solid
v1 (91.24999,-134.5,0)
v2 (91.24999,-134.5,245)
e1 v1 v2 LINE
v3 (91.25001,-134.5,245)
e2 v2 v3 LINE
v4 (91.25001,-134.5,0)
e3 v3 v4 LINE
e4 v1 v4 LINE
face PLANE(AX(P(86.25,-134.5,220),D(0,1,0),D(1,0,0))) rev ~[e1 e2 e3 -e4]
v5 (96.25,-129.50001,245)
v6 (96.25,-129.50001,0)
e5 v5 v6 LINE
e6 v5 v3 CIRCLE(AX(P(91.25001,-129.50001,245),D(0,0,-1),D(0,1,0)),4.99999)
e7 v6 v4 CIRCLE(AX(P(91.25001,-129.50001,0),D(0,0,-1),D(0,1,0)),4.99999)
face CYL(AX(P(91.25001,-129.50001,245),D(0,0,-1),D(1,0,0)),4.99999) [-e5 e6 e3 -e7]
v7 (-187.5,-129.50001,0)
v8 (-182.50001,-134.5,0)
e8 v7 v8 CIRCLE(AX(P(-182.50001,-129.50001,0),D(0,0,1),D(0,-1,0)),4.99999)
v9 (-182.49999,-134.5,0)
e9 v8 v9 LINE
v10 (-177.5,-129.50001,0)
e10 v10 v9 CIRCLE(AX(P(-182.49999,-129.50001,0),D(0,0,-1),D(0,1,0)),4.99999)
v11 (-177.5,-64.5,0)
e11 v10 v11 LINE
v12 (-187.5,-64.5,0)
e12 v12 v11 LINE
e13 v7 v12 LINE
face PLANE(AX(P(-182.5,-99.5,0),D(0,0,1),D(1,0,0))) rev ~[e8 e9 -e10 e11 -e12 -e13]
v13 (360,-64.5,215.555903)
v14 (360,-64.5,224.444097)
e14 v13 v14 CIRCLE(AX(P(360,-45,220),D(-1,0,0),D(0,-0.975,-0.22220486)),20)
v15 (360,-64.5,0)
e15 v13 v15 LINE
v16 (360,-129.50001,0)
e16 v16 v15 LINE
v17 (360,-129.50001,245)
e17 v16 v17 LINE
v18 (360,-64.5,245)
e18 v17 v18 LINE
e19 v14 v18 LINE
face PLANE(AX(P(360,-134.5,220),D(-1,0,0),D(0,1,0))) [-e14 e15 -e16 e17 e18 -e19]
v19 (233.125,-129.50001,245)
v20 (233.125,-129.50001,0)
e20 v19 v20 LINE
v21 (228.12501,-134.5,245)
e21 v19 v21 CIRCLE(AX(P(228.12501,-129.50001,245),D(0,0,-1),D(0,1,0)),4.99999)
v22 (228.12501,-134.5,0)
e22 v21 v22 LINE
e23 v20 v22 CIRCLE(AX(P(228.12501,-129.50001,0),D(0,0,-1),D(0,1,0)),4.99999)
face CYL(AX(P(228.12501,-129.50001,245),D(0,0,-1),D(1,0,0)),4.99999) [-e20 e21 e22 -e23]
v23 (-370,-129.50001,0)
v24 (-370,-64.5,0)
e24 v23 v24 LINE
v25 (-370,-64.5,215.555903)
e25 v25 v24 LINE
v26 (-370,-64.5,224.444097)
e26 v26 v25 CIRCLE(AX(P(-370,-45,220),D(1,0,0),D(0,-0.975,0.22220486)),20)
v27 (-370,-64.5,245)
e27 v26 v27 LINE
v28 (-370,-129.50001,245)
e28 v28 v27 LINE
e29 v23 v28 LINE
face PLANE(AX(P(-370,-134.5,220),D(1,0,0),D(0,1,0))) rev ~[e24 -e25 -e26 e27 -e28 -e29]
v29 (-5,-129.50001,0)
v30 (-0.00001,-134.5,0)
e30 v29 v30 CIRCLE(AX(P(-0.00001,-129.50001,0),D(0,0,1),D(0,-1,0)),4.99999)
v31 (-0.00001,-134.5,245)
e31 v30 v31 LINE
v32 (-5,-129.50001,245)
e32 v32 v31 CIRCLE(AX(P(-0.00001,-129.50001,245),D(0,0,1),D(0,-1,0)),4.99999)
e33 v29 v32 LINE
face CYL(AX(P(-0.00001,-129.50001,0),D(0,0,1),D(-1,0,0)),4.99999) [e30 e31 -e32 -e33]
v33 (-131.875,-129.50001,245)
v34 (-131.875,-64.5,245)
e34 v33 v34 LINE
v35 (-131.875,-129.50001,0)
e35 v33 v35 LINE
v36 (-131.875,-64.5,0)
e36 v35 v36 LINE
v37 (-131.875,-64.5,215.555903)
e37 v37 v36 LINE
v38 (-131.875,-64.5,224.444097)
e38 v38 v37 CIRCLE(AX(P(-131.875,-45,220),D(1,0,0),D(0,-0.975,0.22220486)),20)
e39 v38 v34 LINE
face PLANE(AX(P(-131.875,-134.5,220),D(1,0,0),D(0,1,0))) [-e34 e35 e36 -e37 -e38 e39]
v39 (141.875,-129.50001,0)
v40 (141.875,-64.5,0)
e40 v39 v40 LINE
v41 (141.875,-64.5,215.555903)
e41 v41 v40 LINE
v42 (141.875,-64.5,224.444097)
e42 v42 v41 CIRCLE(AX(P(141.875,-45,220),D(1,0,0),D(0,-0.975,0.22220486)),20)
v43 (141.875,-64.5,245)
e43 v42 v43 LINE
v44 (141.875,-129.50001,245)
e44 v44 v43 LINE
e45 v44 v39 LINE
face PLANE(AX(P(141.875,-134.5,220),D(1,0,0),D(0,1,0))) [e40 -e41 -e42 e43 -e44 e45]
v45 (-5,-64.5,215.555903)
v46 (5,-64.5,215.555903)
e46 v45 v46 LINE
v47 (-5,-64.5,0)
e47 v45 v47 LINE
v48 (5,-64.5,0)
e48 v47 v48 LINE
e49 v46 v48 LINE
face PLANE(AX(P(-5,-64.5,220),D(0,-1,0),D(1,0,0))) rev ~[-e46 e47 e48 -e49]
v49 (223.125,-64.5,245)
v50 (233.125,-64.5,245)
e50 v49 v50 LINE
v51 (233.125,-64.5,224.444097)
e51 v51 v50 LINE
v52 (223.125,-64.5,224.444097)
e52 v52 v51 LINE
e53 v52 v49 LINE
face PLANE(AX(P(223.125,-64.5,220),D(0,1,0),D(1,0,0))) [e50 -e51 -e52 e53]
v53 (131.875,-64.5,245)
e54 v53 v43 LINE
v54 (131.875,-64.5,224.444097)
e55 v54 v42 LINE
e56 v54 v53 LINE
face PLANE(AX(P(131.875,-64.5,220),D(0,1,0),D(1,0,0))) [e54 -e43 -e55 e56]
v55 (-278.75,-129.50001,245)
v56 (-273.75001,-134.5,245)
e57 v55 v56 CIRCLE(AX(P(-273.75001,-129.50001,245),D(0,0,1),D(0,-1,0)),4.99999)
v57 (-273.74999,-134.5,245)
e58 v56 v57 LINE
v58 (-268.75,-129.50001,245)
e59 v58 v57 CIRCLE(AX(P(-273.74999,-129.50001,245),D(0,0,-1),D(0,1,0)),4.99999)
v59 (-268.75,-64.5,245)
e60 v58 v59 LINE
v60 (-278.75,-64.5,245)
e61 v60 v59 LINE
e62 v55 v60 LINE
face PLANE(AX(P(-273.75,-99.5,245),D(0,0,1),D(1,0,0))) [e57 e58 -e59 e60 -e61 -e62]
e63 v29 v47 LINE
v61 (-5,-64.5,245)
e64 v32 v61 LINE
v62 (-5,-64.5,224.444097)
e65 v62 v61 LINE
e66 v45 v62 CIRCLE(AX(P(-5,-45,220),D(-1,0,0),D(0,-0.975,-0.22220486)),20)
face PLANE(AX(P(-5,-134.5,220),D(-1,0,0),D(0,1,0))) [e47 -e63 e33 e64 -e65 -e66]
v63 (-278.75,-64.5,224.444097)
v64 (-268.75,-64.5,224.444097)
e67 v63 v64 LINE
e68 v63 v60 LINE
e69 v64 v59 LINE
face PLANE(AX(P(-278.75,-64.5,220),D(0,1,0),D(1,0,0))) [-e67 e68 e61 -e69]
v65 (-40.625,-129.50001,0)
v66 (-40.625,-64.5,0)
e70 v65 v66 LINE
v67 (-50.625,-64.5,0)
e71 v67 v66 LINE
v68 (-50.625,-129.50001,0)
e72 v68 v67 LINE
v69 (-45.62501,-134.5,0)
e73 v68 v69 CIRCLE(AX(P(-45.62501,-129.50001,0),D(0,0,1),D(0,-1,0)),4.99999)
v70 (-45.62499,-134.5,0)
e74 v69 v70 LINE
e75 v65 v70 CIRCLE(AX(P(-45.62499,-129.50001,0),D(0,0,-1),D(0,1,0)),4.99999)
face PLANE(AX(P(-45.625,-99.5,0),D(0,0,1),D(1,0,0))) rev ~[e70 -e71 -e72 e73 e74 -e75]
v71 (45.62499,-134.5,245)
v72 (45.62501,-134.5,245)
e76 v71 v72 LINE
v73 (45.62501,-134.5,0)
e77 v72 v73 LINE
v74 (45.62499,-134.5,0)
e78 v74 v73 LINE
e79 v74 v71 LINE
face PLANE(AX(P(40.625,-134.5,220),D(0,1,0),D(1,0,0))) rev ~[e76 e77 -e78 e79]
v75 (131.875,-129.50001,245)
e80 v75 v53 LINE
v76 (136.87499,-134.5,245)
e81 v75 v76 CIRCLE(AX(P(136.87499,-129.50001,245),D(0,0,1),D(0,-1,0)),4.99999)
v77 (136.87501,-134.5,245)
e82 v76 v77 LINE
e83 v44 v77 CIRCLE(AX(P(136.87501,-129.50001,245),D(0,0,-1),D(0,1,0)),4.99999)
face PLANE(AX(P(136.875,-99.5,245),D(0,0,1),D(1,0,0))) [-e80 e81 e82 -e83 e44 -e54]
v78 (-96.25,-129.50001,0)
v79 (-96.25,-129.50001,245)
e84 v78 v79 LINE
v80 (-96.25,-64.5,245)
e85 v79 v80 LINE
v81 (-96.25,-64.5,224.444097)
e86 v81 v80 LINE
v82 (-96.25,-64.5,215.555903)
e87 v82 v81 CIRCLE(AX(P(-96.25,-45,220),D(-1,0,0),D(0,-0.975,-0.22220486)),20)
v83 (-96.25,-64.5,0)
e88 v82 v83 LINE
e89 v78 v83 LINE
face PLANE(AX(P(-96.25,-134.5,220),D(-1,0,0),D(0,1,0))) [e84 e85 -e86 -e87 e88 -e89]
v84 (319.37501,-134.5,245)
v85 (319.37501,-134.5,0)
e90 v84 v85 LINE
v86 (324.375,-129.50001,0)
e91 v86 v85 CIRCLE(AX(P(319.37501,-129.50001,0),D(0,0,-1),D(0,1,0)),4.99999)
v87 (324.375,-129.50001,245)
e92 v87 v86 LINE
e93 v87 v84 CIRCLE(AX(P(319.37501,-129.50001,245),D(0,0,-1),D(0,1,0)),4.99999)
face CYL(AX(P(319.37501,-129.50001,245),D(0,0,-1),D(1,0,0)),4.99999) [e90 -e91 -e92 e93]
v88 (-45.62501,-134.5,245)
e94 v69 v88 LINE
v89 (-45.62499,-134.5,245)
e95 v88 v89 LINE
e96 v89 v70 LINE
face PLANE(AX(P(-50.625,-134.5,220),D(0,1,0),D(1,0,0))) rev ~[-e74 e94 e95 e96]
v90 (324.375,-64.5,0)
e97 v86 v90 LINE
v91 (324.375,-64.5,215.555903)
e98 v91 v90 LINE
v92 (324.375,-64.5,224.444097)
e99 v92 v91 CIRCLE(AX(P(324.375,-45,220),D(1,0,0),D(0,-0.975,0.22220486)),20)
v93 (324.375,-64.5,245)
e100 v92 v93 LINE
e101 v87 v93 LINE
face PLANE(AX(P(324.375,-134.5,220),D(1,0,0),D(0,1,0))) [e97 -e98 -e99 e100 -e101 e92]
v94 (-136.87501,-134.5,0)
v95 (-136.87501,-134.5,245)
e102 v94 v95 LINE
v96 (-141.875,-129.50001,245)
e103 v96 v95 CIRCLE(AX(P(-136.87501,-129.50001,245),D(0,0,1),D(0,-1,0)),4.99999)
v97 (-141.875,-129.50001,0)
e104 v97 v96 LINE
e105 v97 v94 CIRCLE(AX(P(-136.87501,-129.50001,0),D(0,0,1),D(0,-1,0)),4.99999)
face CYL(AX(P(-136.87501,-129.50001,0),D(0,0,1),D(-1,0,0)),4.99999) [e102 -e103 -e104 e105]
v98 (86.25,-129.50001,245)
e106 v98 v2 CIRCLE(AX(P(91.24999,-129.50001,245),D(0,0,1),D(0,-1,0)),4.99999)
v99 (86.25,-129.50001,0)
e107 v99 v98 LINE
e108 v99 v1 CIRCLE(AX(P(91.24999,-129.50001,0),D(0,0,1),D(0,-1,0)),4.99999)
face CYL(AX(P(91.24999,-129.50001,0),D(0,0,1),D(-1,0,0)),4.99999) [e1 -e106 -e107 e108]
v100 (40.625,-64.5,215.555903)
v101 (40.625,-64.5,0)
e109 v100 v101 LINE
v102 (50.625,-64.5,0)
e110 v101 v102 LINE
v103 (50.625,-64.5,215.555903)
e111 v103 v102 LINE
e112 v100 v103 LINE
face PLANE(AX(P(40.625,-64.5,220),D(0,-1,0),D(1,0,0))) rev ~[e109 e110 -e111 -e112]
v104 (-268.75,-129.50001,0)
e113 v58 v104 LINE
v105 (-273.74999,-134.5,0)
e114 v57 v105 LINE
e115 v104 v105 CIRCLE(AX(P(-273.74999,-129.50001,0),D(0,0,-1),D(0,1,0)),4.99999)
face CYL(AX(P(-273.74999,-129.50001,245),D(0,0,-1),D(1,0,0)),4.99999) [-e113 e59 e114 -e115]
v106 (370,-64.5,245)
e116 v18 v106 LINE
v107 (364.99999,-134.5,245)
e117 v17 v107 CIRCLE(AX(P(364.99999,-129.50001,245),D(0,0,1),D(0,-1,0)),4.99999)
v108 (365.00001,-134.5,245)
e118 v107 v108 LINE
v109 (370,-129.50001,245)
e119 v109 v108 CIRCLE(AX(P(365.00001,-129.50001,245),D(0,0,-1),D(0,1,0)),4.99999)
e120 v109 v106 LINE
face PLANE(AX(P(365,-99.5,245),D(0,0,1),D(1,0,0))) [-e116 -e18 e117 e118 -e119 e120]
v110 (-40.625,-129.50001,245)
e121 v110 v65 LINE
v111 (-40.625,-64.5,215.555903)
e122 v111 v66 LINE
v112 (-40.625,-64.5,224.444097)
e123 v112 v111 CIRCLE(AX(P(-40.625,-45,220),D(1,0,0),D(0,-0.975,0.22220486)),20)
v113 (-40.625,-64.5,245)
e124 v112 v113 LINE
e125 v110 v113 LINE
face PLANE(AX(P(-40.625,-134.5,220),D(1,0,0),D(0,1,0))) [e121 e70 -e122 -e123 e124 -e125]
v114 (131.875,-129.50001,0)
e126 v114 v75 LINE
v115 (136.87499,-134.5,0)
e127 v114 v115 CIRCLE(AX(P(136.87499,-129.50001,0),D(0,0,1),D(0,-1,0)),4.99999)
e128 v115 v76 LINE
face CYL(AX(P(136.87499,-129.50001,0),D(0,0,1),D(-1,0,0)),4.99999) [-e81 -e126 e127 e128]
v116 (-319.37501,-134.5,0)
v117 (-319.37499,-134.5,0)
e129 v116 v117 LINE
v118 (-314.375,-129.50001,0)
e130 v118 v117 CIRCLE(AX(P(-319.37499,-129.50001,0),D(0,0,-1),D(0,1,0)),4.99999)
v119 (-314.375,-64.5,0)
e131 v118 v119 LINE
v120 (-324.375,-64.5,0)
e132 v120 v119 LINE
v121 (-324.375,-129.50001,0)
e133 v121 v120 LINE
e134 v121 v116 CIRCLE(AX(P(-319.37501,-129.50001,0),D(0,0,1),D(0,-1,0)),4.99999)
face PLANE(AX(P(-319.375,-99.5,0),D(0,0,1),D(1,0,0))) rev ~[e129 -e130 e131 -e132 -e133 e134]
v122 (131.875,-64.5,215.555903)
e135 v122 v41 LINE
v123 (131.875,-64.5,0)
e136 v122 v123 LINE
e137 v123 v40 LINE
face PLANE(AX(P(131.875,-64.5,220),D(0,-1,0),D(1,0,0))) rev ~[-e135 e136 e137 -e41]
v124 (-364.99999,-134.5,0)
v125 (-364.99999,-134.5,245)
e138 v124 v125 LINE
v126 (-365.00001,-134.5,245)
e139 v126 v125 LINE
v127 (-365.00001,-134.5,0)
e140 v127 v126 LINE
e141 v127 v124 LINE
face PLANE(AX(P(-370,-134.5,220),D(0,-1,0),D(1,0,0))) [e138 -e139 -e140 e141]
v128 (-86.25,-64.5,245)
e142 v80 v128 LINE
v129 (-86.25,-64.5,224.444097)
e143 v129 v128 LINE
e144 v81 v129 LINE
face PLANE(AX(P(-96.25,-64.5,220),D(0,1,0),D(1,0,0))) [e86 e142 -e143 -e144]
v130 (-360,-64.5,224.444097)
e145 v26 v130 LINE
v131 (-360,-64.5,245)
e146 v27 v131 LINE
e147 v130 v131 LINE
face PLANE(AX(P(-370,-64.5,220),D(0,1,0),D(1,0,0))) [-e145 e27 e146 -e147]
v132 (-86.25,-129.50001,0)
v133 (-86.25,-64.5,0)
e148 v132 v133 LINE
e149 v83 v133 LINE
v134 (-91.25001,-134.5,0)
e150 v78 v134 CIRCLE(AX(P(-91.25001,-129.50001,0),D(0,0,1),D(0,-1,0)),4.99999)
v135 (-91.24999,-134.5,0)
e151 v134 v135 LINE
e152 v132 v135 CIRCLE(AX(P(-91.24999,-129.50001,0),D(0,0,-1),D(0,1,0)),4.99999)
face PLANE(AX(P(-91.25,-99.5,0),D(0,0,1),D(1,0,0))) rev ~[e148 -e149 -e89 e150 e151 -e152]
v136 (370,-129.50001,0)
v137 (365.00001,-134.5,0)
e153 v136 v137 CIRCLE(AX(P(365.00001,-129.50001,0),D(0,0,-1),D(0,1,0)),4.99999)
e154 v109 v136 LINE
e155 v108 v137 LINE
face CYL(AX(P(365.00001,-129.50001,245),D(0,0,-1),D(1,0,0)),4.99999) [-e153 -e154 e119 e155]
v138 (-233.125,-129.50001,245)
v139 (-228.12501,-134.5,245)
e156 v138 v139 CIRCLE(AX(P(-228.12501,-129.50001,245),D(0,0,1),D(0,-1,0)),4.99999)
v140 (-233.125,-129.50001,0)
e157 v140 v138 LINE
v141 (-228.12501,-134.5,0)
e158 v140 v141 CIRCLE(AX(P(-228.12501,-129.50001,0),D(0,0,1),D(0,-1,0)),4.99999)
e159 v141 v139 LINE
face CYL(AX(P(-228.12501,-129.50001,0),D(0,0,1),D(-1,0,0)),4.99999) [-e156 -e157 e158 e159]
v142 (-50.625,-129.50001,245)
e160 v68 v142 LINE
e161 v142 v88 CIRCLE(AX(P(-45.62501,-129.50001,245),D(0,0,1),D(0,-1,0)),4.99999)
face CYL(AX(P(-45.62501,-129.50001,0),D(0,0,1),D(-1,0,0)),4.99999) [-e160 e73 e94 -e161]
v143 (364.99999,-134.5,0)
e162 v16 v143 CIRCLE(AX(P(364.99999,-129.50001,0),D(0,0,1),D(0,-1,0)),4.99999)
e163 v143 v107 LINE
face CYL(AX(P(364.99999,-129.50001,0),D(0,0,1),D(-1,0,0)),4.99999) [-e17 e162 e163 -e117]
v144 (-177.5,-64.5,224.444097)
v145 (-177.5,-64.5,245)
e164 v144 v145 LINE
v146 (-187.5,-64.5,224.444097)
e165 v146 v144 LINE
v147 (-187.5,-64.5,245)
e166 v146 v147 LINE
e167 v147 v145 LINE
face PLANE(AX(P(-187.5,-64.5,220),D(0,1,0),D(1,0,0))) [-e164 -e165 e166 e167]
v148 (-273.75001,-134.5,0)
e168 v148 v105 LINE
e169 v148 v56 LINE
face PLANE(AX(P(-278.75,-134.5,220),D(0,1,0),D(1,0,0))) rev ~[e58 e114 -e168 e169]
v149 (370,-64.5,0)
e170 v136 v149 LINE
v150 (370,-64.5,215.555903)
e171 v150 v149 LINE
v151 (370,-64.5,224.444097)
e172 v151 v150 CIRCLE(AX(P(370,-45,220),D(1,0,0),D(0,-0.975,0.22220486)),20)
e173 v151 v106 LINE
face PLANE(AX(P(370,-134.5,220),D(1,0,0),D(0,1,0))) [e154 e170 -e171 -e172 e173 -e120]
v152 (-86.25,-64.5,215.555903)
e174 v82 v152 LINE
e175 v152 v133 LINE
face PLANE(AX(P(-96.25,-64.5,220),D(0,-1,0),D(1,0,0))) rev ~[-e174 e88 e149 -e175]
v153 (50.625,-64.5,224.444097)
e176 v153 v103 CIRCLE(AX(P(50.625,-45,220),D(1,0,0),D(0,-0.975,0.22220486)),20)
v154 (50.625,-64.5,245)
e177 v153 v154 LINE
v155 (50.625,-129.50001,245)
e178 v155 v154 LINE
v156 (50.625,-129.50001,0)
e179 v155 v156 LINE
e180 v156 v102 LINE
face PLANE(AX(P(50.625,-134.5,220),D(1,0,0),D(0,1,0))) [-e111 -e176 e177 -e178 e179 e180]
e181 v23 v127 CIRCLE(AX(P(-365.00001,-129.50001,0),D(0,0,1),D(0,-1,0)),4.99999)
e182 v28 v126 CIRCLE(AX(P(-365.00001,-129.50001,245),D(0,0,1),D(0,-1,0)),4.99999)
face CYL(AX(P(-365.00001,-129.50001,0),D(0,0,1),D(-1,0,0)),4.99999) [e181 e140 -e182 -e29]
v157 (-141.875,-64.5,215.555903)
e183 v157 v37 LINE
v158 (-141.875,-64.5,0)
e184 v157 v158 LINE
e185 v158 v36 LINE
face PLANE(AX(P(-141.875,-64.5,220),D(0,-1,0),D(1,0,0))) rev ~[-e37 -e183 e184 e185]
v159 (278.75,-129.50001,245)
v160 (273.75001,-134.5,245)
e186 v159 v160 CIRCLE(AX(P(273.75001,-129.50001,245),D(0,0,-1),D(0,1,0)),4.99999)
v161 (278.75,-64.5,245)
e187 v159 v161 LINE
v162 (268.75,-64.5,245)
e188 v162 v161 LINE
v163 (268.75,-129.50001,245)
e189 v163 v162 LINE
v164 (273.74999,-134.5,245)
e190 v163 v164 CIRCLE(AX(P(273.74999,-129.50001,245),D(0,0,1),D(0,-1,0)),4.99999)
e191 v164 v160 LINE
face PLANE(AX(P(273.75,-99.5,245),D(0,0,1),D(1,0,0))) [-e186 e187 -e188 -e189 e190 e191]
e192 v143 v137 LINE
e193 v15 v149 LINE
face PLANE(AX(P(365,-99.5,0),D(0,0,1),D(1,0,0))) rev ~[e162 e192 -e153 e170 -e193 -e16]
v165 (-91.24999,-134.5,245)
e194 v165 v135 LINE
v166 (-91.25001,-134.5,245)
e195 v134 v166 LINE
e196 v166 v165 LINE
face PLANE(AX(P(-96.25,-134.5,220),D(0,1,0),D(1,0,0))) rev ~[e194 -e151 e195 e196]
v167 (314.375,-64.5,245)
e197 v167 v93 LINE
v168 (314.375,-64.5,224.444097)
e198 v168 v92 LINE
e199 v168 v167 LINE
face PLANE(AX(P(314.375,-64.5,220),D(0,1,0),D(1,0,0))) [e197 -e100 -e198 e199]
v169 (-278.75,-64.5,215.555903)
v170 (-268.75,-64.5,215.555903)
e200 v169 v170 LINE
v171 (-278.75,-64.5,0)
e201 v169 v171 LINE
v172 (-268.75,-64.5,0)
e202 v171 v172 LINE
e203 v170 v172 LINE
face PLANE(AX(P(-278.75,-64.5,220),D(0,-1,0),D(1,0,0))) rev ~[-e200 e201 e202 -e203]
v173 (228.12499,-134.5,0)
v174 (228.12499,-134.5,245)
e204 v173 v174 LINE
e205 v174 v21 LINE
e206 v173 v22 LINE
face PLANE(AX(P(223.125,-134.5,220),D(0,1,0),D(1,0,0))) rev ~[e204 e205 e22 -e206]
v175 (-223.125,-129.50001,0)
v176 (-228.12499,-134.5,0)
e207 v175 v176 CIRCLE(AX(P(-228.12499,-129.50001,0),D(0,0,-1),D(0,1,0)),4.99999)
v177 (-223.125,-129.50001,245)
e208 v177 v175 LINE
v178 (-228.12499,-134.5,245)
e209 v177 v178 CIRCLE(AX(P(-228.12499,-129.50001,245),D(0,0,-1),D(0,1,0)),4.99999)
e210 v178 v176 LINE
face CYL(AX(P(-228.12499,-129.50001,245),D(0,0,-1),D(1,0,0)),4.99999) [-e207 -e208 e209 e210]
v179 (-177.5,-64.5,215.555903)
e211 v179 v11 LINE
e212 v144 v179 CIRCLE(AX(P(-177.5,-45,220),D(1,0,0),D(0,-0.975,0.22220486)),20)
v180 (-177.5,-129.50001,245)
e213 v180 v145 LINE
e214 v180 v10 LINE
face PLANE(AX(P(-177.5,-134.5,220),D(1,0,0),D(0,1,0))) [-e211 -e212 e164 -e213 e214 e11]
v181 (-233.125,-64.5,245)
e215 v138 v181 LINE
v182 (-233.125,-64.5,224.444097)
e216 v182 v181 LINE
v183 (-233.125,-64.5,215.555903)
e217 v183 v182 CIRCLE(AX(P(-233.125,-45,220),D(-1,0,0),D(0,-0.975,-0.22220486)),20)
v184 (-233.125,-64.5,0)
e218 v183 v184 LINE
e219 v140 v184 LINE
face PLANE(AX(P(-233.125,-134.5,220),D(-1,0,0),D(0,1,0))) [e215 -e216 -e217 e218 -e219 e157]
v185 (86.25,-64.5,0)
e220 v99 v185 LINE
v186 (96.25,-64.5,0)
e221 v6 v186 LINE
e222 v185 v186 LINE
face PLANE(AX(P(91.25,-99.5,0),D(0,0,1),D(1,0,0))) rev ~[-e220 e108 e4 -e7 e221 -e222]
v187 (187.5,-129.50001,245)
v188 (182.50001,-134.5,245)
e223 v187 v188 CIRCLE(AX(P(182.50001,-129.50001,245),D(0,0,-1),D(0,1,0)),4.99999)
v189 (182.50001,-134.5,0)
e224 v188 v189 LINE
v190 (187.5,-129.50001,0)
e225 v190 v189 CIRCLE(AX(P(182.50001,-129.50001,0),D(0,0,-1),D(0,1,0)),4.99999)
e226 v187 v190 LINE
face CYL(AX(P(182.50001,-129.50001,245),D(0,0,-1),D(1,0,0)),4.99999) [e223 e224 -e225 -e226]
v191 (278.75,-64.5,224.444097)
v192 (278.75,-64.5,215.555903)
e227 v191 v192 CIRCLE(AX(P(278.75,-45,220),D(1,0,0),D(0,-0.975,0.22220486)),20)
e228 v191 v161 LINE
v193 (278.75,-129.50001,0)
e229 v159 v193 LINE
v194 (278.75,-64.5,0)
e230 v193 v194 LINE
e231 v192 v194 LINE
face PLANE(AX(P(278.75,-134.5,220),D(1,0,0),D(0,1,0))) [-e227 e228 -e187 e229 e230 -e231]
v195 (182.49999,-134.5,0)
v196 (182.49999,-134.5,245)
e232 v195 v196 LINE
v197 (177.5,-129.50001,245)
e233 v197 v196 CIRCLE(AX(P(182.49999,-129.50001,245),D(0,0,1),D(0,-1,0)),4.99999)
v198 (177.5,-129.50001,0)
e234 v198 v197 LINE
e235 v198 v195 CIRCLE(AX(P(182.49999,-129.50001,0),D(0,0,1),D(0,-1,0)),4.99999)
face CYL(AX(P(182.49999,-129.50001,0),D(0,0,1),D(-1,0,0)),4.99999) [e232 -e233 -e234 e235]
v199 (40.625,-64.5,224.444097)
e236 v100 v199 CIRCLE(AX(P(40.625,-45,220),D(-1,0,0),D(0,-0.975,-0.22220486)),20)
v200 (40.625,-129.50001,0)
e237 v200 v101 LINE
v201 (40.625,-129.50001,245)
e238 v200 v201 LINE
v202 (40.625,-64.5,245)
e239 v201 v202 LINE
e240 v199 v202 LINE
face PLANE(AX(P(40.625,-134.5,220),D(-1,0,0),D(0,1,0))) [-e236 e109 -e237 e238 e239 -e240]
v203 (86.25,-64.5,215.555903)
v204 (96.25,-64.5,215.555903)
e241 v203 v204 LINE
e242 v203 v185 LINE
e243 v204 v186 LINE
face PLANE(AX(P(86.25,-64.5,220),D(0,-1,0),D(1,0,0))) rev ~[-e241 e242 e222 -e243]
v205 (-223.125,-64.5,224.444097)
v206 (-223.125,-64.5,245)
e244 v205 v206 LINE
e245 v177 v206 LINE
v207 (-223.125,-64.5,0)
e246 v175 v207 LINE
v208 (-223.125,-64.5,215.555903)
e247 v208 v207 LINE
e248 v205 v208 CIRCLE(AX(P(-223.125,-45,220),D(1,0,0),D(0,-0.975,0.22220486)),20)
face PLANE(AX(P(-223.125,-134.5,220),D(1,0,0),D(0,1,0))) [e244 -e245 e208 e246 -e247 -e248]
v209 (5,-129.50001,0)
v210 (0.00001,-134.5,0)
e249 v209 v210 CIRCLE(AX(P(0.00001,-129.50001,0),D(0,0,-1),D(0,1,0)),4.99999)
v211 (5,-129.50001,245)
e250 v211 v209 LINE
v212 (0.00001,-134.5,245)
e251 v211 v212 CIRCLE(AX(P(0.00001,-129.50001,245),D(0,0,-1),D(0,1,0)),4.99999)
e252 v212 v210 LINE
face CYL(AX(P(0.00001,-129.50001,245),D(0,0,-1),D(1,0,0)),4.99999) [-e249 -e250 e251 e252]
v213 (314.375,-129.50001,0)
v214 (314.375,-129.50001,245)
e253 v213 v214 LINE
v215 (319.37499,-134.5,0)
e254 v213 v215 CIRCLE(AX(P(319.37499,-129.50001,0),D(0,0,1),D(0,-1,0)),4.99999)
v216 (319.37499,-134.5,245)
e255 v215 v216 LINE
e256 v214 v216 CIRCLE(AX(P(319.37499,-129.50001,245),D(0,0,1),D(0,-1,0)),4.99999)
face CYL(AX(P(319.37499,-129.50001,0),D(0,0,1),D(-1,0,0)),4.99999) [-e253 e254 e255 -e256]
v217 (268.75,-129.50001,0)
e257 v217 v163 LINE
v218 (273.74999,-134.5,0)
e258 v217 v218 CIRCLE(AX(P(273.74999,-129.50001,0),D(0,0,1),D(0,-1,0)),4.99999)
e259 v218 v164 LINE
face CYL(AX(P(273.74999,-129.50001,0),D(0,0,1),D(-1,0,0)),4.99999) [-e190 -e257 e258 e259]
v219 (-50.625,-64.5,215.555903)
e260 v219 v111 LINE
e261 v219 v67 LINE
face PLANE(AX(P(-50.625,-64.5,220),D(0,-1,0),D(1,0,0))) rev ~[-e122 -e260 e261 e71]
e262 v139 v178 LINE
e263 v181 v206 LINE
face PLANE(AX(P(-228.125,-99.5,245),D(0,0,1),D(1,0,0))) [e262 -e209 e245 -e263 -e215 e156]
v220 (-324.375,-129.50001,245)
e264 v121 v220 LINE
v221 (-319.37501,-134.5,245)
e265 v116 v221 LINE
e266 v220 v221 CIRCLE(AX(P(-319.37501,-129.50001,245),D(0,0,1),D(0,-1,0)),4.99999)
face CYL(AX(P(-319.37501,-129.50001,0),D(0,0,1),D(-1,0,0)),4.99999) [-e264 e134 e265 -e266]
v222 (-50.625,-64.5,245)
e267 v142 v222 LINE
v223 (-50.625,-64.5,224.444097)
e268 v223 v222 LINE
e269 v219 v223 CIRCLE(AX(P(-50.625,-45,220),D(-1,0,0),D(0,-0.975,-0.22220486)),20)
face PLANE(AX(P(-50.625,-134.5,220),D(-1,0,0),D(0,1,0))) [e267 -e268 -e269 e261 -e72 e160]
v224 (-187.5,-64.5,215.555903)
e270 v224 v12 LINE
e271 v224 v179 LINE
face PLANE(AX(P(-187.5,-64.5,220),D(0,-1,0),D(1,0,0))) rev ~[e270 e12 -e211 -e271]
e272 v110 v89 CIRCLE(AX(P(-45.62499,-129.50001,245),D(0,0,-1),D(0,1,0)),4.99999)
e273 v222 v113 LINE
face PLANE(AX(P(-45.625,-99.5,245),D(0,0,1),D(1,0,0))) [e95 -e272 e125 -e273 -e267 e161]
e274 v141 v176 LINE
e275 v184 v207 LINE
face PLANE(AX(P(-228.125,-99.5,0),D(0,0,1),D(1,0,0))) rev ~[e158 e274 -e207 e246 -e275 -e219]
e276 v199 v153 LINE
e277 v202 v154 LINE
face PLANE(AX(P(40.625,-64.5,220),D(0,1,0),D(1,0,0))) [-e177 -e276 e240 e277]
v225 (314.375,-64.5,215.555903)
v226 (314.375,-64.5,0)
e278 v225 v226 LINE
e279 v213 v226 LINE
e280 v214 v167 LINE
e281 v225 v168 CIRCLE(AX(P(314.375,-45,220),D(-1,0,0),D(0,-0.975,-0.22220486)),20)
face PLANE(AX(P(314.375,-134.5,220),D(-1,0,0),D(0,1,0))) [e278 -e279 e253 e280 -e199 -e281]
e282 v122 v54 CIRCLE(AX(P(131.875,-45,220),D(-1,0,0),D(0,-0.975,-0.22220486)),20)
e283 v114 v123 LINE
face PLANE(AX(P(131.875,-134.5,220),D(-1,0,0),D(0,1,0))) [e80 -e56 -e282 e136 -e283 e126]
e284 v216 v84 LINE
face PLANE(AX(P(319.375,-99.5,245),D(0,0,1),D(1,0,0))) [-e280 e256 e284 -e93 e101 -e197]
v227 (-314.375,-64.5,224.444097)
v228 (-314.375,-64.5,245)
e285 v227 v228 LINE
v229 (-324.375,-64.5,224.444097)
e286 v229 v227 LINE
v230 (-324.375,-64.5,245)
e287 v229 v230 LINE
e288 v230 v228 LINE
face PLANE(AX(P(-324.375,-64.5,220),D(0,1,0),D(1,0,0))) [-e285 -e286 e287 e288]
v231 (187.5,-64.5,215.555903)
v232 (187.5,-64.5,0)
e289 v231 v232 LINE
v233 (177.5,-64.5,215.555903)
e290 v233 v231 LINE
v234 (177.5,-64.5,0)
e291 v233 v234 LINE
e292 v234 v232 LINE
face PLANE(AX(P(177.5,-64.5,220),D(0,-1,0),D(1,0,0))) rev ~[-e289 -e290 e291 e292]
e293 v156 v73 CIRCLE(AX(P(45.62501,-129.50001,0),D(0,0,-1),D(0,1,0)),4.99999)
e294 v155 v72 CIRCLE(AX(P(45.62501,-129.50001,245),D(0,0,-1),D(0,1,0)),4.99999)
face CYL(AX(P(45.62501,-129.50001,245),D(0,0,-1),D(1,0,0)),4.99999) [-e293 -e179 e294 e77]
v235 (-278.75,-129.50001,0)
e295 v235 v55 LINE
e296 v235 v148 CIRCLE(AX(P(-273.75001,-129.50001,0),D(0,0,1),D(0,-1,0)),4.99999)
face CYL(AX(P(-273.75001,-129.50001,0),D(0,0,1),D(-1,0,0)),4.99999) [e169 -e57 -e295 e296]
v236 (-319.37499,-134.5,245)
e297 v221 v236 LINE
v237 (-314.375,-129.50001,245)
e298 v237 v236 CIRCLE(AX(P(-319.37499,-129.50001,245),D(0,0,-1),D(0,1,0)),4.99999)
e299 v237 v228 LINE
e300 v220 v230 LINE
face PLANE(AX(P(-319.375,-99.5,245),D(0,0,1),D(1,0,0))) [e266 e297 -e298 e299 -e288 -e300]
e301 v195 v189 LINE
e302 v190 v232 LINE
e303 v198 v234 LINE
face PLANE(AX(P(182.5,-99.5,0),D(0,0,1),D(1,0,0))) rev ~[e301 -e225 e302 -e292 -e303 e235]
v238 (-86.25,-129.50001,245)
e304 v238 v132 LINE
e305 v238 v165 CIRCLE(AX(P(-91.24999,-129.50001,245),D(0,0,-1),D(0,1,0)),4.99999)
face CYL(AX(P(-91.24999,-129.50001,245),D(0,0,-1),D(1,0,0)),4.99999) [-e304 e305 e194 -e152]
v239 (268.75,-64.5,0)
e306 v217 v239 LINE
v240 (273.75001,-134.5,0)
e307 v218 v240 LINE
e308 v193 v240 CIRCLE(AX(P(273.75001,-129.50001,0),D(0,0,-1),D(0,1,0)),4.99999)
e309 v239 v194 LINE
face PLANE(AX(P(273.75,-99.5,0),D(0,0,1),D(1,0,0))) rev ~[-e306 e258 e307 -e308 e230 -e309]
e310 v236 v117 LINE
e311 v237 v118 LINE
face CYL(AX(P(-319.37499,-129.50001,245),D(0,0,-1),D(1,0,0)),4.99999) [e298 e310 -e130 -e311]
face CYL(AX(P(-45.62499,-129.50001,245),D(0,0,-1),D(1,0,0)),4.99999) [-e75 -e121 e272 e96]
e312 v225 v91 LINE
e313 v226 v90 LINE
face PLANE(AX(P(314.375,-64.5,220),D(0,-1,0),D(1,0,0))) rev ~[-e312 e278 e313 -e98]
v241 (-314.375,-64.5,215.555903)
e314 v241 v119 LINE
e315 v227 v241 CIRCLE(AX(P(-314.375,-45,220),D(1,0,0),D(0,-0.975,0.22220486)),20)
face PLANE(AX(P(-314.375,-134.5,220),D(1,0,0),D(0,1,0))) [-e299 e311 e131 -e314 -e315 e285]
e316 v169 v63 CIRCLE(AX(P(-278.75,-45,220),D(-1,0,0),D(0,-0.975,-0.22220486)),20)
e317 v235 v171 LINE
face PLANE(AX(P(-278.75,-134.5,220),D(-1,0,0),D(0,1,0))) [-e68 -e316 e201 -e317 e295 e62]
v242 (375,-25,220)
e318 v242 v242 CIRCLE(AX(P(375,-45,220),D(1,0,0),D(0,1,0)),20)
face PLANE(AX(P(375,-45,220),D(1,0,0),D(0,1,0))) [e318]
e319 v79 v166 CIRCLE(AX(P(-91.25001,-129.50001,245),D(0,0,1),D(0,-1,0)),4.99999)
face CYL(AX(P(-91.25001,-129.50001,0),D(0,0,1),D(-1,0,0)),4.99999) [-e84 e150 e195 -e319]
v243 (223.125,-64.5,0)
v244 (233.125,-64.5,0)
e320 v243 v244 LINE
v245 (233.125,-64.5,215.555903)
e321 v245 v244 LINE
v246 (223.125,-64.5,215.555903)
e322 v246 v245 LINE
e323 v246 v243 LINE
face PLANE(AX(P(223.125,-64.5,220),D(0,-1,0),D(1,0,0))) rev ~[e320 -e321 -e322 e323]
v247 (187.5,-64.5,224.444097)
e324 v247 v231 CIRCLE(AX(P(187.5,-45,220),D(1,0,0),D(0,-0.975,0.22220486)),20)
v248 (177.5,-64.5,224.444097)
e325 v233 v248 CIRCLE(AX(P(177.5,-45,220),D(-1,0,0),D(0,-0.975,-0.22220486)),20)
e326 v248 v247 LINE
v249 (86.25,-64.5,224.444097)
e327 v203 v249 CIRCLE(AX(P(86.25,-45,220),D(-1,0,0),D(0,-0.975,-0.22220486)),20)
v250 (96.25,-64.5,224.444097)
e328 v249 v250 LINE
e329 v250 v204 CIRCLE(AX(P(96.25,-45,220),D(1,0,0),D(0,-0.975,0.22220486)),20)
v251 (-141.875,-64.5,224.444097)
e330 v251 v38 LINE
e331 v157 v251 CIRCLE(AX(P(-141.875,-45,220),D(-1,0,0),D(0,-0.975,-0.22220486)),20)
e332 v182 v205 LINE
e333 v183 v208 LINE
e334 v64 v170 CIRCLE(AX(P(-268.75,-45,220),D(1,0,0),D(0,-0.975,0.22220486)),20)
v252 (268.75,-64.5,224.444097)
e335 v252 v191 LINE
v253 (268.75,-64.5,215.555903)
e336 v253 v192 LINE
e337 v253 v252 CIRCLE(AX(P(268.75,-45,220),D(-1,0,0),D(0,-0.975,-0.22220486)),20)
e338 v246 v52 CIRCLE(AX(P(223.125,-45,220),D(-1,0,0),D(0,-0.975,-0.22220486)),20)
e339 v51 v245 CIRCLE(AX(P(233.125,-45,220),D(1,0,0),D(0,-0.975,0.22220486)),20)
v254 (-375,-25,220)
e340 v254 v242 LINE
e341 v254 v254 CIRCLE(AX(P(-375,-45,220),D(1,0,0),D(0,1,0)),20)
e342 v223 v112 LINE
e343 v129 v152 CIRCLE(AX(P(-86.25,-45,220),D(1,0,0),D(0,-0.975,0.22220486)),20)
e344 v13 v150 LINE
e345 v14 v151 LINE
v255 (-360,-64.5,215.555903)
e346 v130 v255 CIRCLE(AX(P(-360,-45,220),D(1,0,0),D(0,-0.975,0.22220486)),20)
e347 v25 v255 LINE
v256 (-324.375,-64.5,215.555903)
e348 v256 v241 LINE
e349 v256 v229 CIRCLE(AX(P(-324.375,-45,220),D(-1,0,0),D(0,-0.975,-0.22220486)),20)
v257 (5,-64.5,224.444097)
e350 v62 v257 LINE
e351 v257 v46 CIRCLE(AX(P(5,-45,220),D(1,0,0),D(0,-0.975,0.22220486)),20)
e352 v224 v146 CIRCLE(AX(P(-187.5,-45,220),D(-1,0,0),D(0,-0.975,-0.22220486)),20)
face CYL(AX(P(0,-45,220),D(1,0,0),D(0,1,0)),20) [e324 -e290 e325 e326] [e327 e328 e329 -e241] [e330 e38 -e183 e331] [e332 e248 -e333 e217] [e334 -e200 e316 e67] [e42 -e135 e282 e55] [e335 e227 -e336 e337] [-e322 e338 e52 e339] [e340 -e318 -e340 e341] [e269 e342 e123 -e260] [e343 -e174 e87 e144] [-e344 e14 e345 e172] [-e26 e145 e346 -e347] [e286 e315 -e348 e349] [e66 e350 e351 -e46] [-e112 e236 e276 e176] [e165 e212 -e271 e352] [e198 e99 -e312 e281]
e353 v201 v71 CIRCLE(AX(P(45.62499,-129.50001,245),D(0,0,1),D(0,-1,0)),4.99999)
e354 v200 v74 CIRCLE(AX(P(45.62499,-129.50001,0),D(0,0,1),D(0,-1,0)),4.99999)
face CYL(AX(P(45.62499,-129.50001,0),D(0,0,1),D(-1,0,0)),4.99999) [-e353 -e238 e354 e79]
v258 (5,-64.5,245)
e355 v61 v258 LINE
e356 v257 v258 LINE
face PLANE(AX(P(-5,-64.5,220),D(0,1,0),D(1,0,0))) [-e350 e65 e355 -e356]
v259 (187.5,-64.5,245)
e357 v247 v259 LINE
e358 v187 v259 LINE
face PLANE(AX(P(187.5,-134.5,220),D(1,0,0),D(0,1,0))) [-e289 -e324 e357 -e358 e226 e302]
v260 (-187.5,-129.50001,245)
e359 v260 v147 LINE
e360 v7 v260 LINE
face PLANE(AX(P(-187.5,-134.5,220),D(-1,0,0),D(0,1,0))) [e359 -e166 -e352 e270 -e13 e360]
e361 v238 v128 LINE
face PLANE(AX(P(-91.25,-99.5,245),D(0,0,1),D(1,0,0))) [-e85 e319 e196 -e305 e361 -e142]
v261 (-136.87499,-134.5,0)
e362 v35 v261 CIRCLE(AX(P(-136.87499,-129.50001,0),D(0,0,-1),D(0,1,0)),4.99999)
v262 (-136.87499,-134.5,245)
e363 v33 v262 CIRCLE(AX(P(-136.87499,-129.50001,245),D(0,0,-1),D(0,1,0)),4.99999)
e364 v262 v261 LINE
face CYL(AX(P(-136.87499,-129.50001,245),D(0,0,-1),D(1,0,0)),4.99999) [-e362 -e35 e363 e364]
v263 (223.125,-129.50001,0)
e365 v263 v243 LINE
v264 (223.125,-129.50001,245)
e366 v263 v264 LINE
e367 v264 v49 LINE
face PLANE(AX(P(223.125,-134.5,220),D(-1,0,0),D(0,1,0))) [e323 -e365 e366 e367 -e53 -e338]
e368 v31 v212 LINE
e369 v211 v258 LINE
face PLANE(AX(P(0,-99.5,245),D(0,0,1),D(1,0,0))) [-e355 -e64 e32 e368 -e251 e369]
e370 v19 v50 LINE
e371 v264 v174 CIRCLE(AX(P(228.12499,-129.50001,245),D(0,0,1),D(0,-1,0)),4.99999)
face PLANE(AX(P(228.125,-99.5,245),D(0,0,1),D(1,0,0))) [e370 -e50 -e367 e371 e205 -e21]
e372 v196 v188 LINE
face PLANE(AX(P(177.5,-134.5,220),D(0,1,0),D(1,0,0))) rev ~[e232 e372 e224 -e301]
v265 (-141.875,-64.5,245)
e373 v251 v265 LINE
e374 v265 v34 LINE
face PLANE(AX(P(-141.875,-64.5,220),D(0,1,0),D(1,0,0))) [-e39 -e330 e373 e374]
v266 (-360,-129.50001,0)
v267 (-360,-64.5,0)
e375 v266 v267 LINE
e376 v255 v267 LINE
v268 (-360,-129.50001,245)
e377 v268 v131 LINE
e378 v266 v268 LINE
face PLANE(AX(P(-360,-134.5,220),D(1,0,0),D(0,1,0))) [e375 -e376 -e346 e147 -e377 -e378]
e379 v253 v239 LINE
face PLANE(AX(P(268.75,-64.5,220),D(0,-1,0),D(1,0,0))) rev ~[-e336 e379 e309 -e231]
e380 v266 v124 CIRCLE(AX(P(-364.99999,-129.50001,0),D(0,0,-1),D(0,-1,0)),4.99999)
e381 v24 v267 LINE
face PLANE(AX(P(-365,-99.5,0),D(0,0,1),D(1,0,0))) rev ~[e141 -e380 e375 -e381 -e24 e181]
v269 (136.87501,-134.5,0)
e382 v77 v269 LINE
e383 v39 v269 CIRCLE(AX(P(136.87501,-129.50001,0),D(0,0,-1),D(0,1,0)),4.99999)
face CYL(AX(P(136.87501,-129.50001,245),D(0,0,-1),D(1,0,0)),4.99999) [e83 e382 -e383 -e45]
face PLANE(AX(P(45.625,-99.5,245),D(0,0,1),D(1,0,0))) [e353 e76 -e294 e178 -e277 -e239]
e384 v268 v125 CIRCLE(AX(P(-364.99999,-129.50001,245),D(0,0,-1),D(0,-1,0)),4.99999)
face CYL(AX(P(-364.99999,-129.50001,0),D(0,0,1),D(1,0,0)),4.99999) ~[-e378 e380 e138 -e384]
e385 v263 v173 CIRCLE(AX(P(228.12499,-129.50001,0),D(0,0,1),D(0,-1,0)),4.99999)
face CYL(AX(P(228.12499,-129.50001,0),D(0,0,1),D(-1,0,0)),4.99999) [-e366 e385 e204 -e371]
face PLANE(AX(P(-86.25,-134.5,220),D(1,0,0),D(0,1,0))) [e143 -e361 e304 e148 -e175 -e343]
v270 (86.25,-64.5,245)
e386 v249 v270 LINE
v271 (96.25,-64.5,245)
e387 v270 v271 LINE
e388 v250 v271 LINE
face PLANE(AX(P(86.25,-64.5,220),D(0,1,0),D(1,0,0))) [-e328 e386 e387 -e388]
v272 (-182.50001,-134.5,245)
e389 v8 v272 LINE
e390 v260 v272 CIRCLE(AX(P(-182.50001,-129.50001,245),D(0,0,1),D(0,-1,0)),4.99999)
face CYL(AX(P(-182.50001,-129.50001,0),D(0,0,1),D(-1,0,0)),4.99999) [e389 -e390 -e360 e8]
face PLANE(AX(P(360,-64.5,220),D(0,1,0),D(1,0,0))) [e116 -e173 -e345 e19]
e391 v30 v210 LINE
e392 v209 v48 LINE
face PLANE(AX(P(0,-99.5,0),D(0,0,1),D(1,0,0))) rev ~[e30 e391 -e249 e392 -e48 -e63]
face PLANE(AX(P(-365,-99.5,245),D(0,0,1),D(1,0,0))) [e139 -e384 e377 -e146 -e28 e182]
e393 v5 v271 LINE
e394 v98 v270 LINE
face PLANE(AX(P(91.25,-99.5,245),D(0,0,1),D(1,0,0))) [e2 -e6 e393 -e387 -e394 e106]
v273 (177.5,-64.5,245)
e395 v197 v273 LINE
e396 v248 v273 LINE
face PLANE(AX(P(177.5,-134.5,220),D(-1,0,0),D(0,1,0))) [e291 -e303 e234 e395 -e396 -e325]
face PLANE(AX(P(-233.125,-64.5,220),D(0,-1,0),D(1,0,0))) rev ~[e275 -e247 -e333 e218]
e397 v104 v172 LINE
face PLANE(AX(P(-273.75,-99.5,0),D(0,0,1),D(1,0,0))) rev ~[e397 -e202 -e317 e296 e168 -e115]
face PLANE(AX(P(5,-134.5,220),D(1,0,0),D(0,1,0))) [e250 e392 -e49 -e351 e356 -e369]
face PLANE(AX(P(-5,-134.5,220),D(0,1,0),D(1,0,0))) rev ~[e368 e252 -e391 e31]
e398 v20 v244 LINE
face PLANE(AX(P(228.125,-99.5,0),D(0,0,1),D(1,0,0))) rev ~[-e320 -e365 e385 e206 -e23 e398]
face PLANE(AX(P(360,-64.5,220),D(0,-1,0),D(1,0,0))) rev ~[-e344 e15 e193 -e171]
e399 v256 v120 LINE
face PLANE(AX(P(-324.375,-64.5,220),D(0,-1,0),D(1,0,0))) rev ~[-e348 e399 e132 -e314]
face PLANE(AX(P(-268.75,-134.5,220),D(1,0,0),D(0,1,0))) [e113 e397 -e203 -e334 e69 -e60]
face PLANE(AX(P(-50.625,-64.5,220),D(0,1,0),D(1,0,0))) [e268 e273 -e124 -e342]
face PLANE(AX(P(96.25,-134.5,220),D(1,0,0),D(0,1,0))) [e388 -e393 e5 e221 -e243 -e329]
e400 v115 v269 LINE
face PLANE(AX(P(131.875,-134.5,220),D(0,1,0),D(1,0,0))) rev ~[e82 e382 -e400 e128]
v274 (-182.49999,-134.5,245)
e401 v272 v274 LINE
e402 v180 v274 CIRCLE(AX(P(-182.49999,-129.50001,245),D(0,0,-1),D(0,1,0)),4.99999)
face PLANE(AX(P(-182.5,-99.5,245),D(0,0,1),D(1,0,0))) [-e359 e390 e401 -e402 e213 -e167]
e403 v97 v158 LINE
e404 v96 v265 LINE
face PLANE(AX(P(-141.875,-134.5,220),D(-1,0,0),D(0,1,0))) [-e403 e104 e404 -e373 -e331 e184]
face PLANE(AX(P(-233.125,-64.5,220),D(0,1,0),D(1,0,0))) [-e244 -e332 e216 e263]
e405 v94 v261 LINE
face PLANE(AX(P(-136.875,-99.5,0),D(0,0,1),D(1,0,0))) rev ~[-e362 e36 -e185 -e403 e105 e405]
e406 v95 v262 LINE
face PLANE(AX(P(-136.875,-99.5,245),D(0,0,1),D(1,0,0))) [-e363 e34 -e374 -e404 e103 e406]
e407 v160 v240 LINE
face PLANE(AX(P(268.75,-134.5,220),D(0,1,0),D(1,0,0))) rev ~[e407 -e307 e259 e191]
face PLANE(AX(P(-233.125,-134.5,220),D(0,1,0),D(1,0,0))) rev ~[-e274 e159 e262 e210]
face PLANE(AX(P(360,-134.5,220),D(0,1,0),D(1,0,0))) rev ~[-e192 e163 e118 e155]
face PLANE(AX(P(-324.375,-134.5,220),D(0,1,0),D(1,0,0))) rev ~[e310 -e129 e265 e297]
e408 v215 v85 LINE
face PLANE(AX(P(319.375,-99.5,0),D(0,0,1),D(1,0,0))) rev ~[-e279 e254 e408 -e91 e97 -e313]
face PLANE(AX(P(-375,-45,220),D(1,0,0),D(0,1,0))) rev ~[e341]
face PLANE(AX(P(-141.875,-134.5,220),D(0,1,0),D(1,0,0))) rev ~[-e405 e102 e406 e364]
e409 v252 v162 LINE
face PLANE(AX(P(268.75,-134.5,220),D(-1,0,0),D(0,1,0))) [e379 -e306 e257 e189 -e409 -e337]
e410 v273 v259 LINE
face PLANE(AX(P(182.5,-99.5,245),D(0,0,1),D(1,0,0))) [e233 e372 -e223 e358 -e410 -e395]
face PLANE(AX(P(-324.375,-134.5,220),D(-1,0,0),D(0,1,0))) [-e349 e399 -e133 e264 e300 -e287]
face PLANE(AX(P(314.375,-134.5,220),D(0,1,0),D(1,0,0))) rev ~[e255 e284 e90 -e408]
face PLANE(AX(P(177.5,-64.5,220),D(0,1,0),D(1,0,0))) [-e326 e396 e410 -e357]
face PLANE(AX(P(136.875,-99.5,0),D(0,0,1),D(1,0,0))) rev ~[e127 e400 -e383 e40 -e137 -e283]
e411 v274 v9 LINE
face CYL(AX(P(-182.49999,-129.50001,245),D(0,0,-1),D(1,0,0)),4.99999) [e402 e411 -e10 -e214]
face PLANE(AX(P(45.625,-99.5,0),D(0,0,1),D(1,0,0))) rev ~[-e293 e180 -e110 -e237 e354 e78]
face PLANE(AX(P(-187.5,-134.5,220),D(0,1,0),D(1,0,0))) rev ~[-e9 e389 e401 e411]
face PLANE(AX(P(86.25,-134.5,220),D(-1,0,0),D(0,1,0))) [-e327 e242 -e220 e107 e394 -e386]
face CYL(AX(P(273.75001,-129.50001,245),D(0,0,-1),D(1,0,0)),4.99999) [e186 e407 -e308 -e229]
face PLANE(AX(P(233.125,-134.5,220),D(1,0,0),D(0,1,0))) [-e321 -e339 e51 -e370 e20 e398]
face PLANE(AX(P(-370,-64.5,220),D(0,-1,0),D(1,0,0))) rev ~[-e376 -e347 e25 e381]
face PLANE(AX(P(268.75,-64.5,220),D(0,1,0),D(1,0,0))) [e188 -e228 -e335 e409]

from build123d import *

# Parameters (mm, degrees)
F0_R          = 20
F1_DEPTH      = 375
F3_W          = 10
F3_H          = 70
F4_DEPTH      = 25
F4_DEPTH_BACK = 220
F5_R          = 4.99999
F6_R          = 4.99999


# Not quite as in the source:
# - a fillet or chamfer is up to 0.001 mm smaller than in the source, because OpenCascade refuses the exact size
# - a feature names something its author has since deleted; it is built from what else it names


with BuildPart() as f1:
    # F0 (on Right) → F1 (new body, symmetric)
    with BuildSketch(Plane.YZ):
        with Locations((-45, 220)):
            Circle(F0_R)
    extrude(amount=F1_DEPTH, both=True)

    # F3 (on plane+point) → F4 (join, two sides)
    with BuildSketch(Plane.XY.offset(220)) as f4_sk:
        with Locations((-365, -99.5)):
            Rectangle(F3_W, F3_H)
        with Locations((-319.375, -99.5)):
            Rectangle(F3_W, F3_H)
        with Locations((-273.75, -99.5)):
            Rectangle(F3_W, F3_H)
        with Locations((-228.125, -99.5)):
            Rectangle(F3_W, F3_H)
        with Locations((-182.5, -99.5)):
            Rectangle(F3_W, F3_H)
        with Locations((-136.875, -99.5)):
            Rectangle(F3_W, F3_H)
        with Locations((-91.25, -99.5)):
            Rectangle(F3_W, F3_H)
        with Locations((-45.625, -99.5)):
            Rectangle(F3_W, F3_H)
        with Locations((0, -99.5)):
            Rectangle(F3_W, F3_H)
        with Locations((45.625, -99.5)):
            Rectangle(F3_W, F3_H)
        with Locations((91.25, -99.5)):
            Rectangle(F3_W, F3_H)
        with Locations((136.875, -99.5)):
            Rectangle(F3_W, F3_H)
        with Locations((182.5, -99.5)):
            Rectangle(F3_W, F3_H)
        with Locations((228.125, -99.5)):
            Rectangle(F3_W, F3_H)
        with Locations((273.75, -99.5)):
            Rectangle(F3_W, F3_H)
        with Locations((319.375, -99.5)):
            Rectangle(F3_W, F3_H)
        with Locations((365, -99.5)):
            Rectangle(F3_W, F3_H)
    extrude(amount=F4_DEPTH)
    extrude(f4_sk.sketch, amount=-F4_DEPTH_BACK)

    # F5 (radius 5 in the source; OpenCascade refuses exactly that, so slightly less here)
    f5_edges = [f1.edges().sort_by_distance(p)[0] for p in [
        (-360, -134.5, 122.5),
        (-370, -134.5, 122.5),
    ]]
    fillet(f5_edges, radius=F5_R)

    # F6 (radius 5 in the source; OpenCascade refuses exactly that, so slightly less here)
    f6_edges = [f1.edges().sort_by_distance(p)[0] for p in [
        (-324.375, -134.5, 122.5),
        (-314.375, -134.5, 122.5),
        (-278.75, -134.5, 122.5),
        (-268.75, -134.5, 122.5),
        (-223.125, -134.5, 122.5),
        (-233.125, -134.5, 122.5),
        (-177.5, -134.5, 122.5),
        (-187.5, -134.5, 122.5),
        (-131.875, -134.5, 122.5),
        (-141.875, -134.5, 122.5),
        (-86.25, -134.5, 122.5),
        (-96.25, -134.5, 122.5),
        (-40.625, -134.5, 122.5),
        (-50.625, -134.5, 122.5),
        (5, -134.5, 122.5),
        (-5, -134.5, 122.5),
        (50.625, -134.5, 122.5),
        (40.625, -134.5, 122.5),
        (86.25, -134.5, 122.5),
        (96.25, -134.5, 122.5),
        (131.875, -134.5, 122.5),
        (141.875, -134.5, 122.5),
        (187.5, -134.5, 122.5),
        (177.5, -134.5, 122.5),
        (233.125, -134.5, 122.5),
        (223.125, -134.5, 122.5),
        (278.75, -134.5, 122.5),
        (268.75, -134.5, 122.5),
        (324.375, -134.5, 122.5),
        (314.375, -134.5, 122.5),
        (370, -134.5, 122.5),
        (360, -134.5, 122.5),
    ]]
    fillet(f6_edges, radius=F6_R)


solid = f1.part
